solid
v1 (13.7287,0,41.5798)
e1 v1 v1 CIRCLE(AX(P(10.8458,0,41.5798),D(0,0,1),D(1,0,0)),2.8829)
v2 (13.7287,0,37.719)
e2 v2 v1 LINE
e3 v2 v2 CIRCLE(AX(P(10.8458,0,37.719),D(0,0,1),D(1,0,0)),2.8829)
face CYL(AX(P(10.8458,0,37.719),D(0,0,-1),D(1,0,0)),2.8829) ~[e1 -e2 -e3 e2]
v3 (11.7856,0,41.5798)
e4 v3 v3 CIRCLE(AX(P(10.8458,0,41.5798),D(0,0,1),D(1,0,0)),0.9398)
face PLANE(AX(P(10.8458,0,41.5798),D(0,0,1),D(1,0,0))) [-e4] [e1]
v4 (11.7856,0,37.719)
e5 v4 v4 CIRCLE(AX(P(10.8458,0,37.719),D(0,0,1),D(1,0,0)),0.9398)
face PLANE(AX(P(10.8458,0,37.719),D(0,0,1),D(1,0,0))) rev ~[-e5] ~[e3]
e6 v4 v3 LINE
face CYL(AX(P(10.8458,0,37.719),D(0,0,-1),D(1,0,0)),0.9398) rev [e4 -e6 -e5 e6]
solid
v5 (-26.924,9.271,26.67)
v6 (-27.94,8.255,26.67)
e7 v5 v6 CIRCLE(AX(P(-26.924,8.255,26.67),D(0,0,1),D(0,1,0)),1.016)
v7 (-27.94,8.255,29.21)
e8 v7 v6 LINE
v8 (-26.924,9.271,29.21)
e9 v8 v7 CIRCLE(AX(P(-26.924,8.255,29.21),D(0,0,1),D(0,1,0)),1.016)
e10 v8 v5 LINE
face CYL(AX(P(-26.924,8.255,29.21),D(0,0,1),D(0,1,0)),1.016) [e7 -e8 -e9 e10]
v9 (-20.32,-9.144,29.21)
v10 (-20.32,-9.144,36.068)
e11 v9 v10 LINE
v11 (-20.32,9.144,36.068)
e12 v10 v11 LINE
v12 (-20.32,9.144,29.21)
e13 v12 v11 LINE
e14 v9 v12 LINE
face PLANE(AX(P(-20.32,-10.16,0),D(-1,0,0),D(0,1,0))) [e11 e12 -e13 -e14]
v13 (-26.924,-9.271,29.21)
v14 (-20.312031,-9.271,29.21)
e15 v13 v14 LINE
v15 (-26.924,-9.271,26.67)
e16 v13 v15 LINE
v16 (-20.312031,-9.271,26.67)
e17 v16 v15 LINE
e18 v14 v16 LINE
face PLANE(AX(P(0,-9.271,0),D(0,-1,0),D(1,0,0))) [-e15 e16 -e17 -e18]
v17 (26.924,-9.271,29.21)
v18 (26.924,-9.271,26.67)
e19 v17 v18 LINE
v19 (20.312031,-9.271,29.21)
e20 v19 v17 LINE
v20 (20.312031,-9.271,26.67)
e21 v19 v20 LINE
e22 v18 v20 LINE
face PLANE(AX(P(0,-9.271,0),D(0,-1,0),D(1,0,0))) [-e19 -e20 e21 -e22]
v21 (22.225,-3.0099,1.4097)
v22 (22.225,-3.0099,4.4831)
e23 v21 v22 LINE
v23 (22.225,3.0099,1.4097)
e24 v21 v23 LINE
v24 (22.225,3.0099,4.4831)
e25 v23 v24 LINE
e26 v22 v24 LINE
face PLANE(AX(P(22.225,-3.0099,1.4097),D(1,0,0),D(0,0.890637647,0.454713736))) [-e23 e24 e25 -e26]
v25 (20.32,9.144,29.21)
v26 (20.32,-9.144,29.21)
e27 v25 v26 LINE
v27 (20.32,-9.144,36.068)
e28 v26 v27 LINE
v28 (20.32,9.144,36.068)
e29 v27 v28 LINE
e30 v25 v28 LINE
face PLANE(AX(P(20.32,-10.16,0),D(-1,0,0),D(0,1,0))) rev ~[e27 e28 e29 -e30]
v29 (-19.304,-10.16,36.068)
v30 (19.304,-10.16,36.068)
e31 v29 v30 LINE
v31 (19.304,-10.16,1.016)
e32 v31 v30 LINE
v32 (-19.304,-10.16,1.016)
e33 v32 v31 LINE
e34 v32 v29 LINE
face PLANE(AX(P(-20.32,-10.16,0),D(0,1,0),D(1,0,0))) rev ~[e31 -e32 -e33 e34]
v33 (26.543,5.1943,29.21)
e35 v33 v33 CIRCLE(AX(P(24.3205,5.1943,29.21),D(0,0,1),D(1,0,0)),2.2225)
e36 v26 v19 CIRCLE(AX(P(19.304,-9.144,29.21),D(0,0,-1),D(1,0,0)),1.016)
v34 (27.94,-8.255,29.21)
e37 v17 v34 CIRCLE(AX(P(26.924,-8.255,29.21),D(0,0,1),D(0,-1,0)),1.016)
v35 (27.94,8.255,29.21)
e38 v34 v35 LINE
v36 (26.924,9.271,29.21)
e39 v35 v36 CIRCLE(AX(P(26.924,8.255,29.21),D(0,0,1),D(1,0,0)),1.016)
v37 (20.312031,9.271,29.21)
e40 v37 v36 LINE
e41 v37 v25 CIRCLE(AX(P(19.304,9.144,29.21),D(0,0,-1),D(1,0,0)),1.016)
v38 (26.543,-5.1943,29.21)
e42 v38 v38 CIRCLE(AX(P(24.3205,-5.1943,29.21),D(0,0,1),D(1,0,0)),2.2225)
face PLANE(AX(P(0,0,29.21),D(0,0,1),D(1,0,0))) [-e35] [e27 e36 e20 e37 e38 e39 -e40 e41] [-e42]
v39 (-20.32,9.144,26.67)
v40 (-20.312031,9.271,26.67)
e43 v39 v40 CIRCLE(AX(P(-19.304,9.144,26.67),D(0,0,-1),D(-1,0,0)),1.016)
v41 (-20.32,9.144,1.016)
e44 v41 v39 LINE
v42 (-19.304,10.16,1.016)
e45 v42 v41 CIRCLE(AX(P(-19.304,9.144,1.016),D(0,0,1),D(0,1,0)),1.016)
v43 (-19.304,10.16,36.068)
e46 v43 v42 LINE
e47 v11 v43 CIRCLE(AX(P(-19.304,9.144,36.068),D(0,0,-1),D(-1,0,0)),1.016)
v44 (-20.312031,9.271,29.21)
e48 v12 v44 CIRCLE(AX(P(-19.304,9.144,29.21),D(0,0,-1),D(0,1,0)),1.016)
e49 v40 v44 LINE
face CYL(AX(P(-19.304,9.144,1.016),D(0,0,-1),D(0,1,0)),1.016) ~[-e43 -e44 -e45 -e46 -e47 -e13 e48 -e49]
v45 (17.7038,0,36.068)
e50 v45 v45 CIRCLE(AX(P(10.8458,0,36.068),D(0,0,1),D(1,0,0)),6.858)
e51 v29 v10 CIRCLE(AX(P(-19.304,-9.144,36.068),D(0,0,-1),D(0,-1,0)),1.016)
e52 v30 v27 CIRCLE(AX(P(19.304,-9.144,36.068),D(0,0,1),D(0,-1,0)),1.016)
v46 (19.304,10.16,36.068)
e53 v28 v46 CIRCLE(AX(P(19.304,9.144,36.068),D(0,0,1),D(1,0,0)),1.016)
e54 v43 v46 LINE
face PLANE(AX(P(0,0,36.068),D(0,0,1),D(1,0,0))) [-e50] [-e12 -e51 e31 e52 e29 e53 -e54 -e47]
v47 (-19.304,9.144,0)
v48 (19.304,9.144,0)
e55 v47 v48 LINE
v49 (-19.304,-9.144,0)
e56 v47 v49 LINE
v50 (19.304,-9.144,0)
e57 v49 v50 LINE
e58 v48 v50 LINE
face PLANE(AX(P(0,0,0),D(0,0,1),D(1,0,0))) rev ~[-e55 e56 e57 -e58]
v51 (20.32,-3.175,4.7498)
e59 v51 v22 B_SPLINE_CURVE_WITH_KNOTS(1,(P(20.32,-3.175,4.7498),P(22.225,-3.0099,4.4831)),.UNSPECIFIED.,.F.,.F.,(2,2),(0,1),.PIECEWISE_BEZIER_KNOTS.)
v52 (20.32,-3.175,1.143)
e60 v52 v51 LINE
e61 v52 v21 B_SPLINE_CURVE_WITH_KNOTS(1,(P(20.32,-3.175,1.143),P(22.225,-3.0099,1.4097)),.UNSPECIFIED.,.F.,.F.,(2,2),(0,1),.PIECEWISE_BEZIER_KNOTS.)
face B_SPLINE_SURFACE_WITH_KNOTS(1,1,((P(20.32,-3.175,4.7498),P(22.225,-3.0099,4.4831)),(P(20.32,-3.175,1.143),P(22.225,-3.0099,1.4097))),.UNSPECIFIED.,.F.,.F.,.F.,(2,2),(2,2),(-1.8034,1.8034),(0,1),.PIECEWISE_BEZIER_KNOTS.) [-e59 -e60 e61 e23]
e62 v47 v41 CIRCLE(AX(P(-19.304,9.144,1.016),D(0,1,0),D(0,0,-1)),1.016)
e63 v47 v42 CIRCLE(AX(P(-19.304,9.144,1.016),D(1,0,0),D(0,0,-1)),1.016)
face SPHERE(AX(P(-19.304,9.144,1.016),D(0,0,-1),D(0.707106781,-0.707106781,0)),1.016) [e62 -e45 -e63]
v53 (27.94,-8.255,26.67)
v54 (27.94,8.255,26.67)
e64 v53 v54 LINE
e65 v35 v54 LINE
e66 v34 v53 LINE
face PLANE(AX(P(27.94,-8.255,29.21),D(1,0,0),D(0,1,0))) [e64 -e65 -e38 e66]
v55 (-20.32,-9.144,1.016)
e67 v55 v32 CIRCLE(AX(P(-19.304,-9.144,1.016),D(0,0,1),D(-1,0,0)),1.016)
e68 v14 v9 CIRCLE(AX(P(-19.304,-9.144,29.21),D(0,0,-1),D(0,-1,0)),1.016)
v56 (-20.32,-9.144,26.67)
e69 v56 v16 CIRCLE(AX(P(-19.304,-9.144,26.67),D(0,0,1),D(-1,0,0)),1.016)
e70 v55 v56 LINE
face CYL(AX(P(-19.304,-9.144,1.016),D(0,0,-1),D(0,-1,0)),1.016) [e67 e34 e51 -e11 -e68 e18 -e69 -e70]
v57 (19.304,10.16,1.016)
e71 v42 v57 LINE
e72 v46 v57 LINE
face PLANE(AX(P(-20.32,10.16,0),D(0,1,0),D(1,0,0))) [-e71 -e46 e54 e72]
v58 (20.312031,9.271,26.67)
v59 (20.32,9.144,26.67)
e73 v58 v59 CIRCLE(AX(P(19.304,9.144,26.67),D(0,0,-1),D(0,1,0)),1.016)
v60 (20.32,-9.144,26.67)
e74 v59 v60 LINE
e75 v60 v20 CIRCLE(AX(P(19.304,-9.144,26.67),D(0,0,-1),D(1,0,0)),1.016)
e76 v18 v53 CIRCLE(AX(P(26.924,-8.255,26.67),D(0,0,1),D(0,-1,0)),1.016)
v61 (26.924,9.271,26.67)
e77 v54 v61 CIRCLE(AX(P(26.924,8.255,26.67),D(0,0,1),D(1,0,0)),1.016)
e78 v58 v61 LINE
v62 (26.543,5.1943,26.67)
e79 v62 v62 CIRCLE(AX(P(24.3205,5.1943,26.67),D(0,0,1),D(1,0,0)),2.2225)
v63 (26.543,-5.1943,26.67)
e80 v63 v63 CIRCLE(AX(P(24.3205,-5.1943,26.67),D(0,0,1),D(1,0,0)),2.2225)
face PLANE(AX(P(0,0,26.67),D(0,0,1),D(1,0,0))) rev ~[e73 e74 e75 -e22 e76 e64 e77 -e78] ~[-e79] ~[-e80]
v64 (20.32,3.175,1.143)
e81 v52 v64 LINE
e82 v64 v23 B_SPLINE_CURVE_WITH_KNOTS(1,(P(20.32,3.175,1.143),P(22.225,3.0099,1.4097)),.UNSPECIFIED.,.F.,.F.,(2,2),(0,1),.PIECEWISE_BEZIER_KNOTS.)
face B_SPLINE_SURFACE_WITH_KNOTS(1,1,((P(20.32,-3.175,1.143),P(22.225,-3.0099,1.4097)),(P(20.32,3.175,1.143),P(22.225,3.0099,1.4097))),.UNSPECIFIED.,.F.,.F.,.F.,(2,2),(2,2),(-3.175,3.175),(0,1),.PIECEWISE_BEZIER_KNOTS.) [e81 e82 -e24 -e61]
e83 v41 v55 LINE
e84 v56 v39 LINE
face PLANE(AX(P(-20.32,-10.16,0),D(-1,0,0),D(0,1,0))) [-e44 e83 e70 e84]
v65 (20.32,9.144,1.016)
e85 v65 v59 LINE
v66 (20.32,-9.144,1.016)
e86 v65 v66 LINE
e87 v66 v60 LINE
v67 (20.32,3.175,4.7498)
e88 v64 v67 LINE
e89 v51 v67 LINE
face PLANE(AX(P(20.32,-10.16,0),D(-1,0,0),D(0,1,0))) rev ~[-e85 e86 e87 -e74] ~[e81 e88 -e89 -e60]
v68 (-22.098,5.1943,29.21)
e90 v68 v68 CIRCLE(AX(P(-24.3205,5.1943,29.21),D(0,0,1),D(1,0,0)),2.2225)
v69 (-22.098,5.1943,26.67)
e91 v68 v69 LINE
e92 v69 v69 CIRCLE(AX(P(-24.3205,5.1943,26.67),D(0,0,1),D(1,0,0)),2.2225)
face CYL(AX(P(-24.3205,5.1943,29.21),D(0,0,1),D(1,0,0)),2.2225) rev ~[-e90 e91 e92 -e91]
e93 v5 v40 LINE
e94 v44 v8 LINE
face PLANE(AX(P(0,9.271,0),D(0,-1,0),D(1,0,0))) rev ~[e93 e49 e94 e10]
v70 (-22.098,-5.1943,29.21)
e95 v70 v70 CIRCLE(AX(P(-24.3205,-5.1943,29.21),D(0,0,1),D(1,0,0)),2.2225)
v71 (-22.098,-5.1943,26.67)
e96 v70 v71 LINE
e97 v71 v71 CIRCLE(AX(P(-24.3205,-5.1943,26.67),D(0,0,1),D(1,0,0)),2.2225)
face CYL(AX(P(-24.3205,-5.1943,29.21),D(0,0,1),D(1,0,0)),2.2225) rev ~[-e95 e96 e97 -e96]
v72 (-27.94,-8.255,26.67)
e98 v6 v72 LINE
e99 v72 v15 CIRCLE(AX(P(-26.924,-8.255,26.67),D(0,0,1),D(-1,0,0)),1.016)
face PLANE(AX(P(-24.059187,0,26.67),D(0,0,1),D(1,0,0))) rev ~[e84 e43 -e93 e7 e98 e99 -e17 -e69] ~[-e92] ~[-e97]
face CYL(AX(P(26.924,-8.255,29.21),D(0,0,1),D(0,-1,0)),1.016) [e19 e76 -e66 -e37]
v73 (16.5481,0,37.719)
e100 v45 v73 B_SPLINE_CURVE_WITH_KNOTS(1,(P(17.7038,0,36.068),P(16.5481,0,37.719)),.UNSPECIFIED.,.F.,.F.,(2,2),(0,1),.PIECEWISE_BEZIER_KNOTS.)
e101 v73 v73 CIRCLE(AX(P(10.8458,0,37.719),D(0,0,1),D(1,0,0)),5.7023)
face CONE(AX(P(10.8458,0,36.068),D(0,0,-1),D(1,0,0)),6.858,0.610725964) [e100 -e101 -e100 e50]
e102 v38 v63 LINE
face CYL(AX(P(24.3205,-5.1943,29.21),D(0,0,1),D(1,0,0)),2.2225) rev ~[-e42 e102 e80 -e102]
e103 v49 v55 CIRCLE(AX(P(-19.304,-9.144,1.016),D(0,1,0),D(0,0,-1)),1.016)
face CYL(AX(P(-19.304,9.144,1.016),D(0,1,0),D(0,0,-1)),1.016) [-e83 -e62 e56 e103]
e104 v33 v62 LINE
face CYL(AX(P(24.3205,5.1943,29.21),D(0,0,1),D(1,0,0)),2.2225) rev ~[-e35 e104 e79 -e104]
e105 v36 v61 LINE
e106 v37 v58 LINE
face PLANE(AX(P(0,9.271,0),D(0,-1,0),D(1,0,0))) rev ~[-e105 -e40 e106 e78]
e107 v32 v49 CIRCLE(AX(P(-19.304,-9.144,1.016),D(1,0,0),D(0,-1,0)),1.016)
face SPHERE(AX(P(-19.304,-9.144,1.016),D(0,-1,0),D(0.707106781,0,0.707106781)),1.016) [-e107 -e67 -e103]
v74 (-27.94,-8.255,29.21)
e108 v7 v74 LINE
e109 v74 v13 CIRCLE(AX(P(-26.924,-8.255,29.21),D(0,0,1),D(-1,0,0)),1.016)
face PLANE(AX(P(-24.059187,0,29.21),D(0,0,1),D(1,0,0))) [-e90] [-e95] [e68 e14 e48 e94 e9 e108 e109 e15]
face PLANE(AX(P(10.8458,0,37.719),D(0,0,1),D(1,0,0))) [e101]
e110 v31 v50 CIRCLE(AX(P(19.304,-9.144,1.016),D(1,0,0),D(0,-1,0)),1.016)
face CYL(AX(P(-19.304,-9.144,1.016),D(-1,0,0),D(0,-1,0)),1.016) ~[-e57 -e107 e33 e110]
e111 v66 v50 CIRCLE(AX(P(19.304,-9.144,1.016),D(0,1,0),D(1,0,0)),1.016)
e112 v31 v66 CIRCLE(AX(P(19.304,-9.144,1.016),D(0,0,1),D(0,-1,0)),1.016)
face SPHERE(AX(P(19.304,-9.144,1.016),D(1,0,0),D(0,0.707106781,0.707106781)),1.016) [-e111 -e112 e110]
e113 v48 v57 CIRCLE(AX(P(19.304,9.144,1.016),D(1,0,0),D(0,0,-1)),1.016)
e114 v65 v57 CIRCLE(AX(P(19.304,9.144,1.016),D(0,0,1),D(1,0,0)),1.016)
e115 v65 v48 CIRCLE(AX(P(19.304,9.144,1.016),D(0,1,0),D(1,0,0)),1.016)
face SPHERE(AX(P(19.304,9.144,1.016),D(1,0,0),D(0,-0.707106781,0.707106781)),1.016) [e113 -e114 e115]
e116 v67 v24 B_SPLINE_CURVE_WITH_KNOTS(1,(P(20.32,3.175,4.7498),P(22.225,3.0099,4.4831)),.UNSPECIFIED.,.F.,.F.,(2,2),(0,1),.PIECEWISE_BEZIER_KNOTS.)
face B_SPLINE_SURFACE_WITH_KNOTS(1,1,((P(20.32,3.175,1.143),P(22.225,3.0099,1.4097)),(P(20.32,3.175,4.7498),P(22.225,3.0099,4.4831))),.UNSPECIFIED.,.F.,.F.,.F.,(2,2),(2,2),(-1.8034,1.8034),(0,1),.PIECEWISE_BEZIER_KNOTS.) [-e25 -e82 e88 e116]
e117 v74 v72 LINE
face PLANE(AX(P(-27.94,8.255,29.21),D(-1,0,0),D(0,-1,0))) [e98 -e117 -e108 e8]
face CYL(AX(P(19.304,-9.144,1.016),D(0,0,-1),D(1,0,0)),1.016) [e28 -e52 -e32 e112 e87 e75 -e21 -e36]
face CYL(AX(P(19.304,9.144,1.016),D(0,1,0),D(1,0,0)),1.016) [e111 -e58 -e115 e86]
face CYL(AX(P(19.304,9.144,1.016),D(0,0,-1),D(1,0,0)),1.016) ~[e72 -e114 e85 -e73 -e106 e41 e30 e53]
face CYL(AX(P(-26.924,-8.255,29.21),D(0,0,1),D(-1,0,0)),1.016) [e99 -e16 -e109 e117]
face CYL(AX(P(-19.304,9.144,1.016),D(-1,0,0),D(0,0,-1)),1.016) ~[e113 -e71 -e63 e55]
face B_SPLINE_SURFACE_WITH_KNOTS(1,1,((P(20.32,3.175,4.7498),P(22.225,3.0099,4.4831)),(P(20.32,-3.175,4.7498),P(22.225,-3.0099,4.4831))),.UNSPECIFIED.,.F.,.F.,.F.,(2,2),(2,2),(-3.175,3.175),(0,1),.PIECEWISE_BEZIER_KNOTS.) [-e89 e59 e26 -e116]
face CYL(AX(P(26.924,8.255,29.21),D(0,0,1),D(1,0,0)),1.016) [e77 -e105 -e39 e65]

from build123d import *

# Parameters (mm, degrees)
F0_W           = 40.64
F0_H           = 20.32
F1_DEPTH       = 36.068
F2_W           = 6.35
F2_H           = 3.6068
F4_W           = 6.0198
F4_H           = 3.0734
F7_R           = 2.2225
F8_DEPTH       = 2.54
F9_R           = 6.858
F11_R          = 5.7023
F13_T1_DEPTH   = 38.608
F13_T3_DEPTH   = 18.288
F13_S7_W       = 1.016
F13_S7_H       = 1.016
F13_T8_DEPTH   = 1.016
F13_S13_W      = 1.016
F13_S13_H      = 1.016
F13_T14_DEPTH  = 1.016
F13_S19_W      = 1.016
F13_S19_H      = 1.016
F13_T20_DEPTH  = 1.016
F13_S25_W      = 1.016
F13_S25_H      = 1.016
F13_T26_DEPTH  = 1.016
F13_T32_DEPTH  = 37.592
F13_T38_DEPTH  = 37.592
F13_T44_DEPTH  = 37.592
F13_T51_DEPTH  = 37.592
F13_T57_DEPTH  = 37.592
F13_T63_DEPTH  = 37.592
F13_T69_DEPTH  = 37.592
F13_T75_DEPTH  = 37.592
F13_T82_DEPTH  = 37.592
F13_T88_DEPTH  = 37.592
F13_T94_DEPTH  = 37.592
F13_T100_DEPTH = 37.592
F13_T106_DEPTH = 37.592
F13_T113_DEPTH = 37.592
F13_T119_DEPTH = 37.592
F13_T125_DEPTH = 37.592
F13_T131_DEPTH = 37.592
F13_T137_DEPTH = 37.592
F13_T144_DEPTH = 37.592
F13_T150_DEPTH = 37.592
F14_R          = 2.8829
F14_R_2        = 0.9398
F15_DEPTH      = 3.8608


# Not quite as in the source:
# - a fillet or chamfer that OpenCascade refuses, or shapes differently, is made with other operations: its cross-section is extruded or revolved along the edge and cut away or added


with BuildPart() as f1:
    # F0 (on Top) → F1 (new body)
    with BuildSketch(Plane.XY):
        Rectangle(F0_W, F0_H)
    extrude(amount=F1_DEPTH)

    # F2 (on face) → F5 section 0
    with BuildSketch(Plane.YZ.offset(20.32)):
        with Locations((0, 2.9464)):
            Rectangle(F2_W, F2_H)
    # F4 (on offset) → F5 section 1
    with BuildSketch(Plane.YZ.offset(22.225)):
        with Locations((0, 2.9464)):
            Rectangle(F4_W, F4_H)
    loft()

    # F7 (on offset) → F8 (join)
    with BuildSketch(Plane.XY.offset(29.21)):
        with BuildLine():
            ThreePointArc((-27.94, -8.255), (-27.6424204897, -8.9734204897), (-26.924, -9.271))
            Line((-26.924, -9.271), (-20.32, -9.271))
            Line((-20.32, -9.271), (-20.32, 9.271))
            Line((-20.32, 9.271), (-26.924, 9.271))
            ThreePointArc((-26.924, 9.271), (-27.6424204897, 8.9734204897), (-27.94, 8.255))
            Line((-27.94, 8.255), (-27.94, -8.255))
        make_face()
        with Locations((-24.3205, -5.1943)):
            Circle(F7_R, mode=Mode.SUBTRACT)
        with Locations((-24.3205, 5.1943)):
            Circle(F7_R, mode=Mode.SUBTRACT)
        with BuildLine():
            ThreePointArc((27.94, 8.255), (27.6424204897, 8.9734204897), (26.924, 9.271))
            Line((26.924, 9.271), (20.32, 9.271))
            Line((20.32, 9.271), (20.32, -9.271))
            Line((20.32, -9.271), (26.924, -9.271))
            ThreePointArc((26.924, -9.271), (27.6424204897, -8.9734204897), (27.94, -8.255))
            Line((27.94, -8.255), (27.94, 8.255))
        make_face()
        with Locations((24.3205, -5.1943)):
            Circle(F7_R, mode=Mode.SUBTRACT)
        with Locations((24.3205, 5.1943)):
            Circle(F7_R, mode=Mode.SUBTRACT)
    extrude(amount=-F8_DEPTH)

    # F9 (on face) → F12 section 0
    with BuildSketch(Plane.XY.offset(36.068)):
        with Locations((10.8458, 0)):
            Circle(F9_R)
    # F11 (on offset) → F12 section 1
    with BuildSketch(Plane.XY.offset(37.719)):
        with Locations((10.8458, 0)):
            Circle(F11_R)
    loft()

    # F13: fillet of radius 1.016 on 8 edges, made by hand

    # F13_s2 → F13_t1 (cut)
    with BuildSketch(Plane.YZ.offset(-19.304)):
        with BuildLine():
            ThreePointArc((-10.16, 1.016), (-9.8624204897, 0.2975795103), (-9.144, 0))
            Line((-9.144, 0), (-10.16, 0))
            Line((-10.16, 0), (-10.16, 1.016))
        make_face()
        with BuildLine():
            ThreePointArc((9.144, 0), (9.8624204897, 0.2975795103), (10.16, 1.016))
            Line((10.16, 1.016), (10.16, 0))
            Line((10.16, 0), (9.144, 0))
        make_face()
    extrude(amount=F13_T1_DEPTH, mode=Mode.SUBTRACT)

    # F13_s4 → F13_t3 (cut)
    with BuildSketch(Plane.XZ.offset(-9.144)):
        with BuildLine():
            ThreePointArc((20.32, 1.016), (20.0224204897, 0.2975795103), (19.304, 0))
            Line((19.304, 0), (20.32, 0))
            Line((20.32, 0), (20.32, 1.016))
        make_face()
        with BuildLine():
            ThreePointArc((-19.304, 0), (-20.0224204897, 0.2975795103), (-20.32, 1.016))
            Line((-20.32, 1.016), (-20.32, 0))
            Line((-20.32, 0), (-19.304, 0))
        make_face()
    extrude(amount=F13_T3_DEPTH, mode=Mode.SUBTRACT)


with BuildPart() as f13_tool6:
    # F13_s7 → F13_t8 (new body)
    with BuildSketch(Plane.YZ.offset(19.304)):
        with Locations((-9.652, 0.508)):
            Rectangle(F13_S7_W, F13_S7_H)
    extrude(amount=F13_T8_DEPTH)

    # F13_s9 → F13_t10 (revolve, cut)
    with BuildSketch(Plane(origin=(19.304, -9.144, 1.016), x_dir=(0, 0.7071067812, 0.7071067812), z_dir=(0, 0.7071067812, -0.7071067812))):
        with BuildLine():
            ThreePointArc((0, -1.016), (1.016, 0), (0, 1.016))
            Line((0, 1.016), (0, -1.016))
        make_face()
    revolve(axis=Axis((19.304, -9.144, 1.016), (1, 0, 0)), mode=Mode.SUBTRACT)


with BuildPart() as f1_1:
    add(f1.part)

    # F13_t5: cut F13_tool6
    add(f13_tool6.part, mode=Mode.SUBTRACT)


with BuildPart() as f13_tool12:
    # F13_s13 → F13_t14 (new body)
    with BuildSketch(Plane.YZ.offset(19.304)):
        with Locations((9.652, 0.508)):
            Rectangle(F13_S13_W, F13_S13_H)
    extrude(amount=F13_T14_DEPTH)

    # F13_s15 → F13_t16 (revolve, cut)
    with BuildSketch(Plane(origin=(19.304, 9.144, 1.016), x_dir=(0, -0.7071067812, 0.7071067812), z_dir=(0, 0.7071067812, 0.7071067812))):
        with BuildLine():
            ThreePointArc((0, -1.016), (1.016, 0), (0, 1.016))
            Line((0, 1.016), (0, -1.016))
        make_face()
    revolve(axis=Axis((19.304, 9.144, 1.016), (1, 0, 0)), mode=Mode.SUBTRACT)


with BuildPart() as f1_2:
    add(f1_1.part)

    # F13_t11: cut F13_tool12
    add(f13_tool12.part, mode=Mode.SUBTRACT)


with BuildPart() as f13_tool18:
    # F13_s19 → F13_t20 (new body)
    with BuildSketch(Plane.XY.offset(1.016)):
        with Locations((-19.812, 9.652)):
            Rectangle(F13_S19_W, F13_S19_H)
    extrude(amount=-F13_T20_DEPTH)

    # F13_s21 → F13_t22 (revolve, cut)
    with BuildSketch(Plane(origin=(-19.304, 9.144, 1.016), x_dir=(0.7071067812, -0.7071067812, 0), z_dir=(0.7071067812, 0.7071067812, 0))):
        with BuildLine():
            ThreePointArc((0, -1.016), (1.016, 0), (0, 1.016))
            Line((0, 1.016), (0, -1.016))
        make_face()
    revolve(axis=Axis((-19.304, 9.144, 1.016), (0, 0, -1)), mode=Mode.SUBTRACT)


with BuildPart() as f1_3:
    add(f1_2.part)

    # F13_t17: cut F13_tool18
    add(f13_tool18.part, mode=Mode.SUBTRACT)


with BuildPart() as f13_tool24:
    # F13_s25 → F13_t26 (new body)
    with BuildSketch(Plane.XZ.offset(9.144)):
        with Locations((-19.812, 0.508)):
            Rectangle(F13_S25_W, F13_S25_H)
    extrude(amount=F13_T26_DEPTH)

    # F13_s27 → F13_t28 (revolve, cut)
    with BuildSketch(Plane(origin=(-19.304, -9.144, 1.016), x_dir=(0.7071067812, 0, 0.7071067812), z_dir=(0.7071067812, 0, -0.7071067812))):
        with BuildLine():
            ThreePointArc((0, -1.016), (1.016, 0), (0, 1.016))
            Line((0, 1.016), (0, -1.016))
        make_face()
    revolve(axis=Axis((-19.304, -9.144, 1.016), (0, -1, 0)), mode=Mode.SUBTRACT)


with BuildPart() as f1_4:
    add(f1_3.part)

    # F13_t23: cut F13_tool24
    add(f13_tool24.part, mode=Mode.SUBTRACT)


with BuildPart() as f13_tool30:
    # F13_s31 → F13_t32 (new body)
    with BuildSketch(Plane.XY.offset(1.016)):
        with BuildLine():
            ThreePointArc((20.32, -9.144), (20.0224204897, -9.8624204897), (19.304, -10.16))
            Line((19.304, -10.16), (20.32, -10.16))
            Line((20.32, -10.16), (20.32, -9.144))
        make_face()
    extrude(amount=F13_T32_DEPTH)

    split(bisect_by=Plane.XY.offset(26.67), keep=Keep.BOTTOM)

    split(bisect_by=Plane.XZ.offset(9.271), keep=Keep.BOTTOM)


with BuildPart() as f1_5:
    add(f1_4.part)

    # F13_t29: cut F13_tool30
    add(f13_tool30.part, mode=Mode.SUBTRACT)


with BuildPart() as f13_tool36:
    # F13_s37 → F13_t38 (new body)
    with BuildSketch(Plane.XY.offset(1.016)):
        with BuildLine():
            ThreePointArc((20.32, -9.144), (20.0224204897, -9.8624204897), (19.304, -10.16))
            Line((19.304, -10.16), (20.32, -10.16))
            Line((20.32, -10.16), (20.32, -9.144))
        make_face()
    extrude(amount=F13_T38_DEPTH)

    split(bisect_by=Plane.XY.offset(26.67), keep=Keep.BOTTOM)

    split(bisect_by=Plane.XZ.offset(9.271), keep=Keep.TOP)


with BuildPart() as f1_6:
    add(f1_5.part)

    # F13_t35: cut F13_tool36
    add(f13_tool36.part, mode=Mode.SUBTRACT)


with BuildPart() as f13_tool42:
    # F13_s43 → F13_t44 (new body)
    with BuildSketch(Plane.XY.offset(1.016)):
        with BuildLine():
            ThreePointArc((20.32, -9.144), (20.0224204897, -9.8624204897), (19.304, -10.16))
            Line((19.304, -10.16), (20.32, -10.16))
            Line((20.32, -10.16), (20.32, -9.144))
        make_face()
    extrude(amount=F13_T44_DEPTH)

    split(bisect_by=Plane.XY.offset(26.67), keep=Keep.TOP)

    split(bisect_by=Plane.XZ.offset(9.271), keep=Keep.TOP)

    split(bisect_by=Plane.XY.offset(29.21), keep=Keep.BOTTOM)


with BuildPart() as f1_7:
    add(f1_6.part)

    # F13_t41: cut F13_tool42
    add(f13_tool42.part, mode=Mode.SUBTRACT)


with BuildPart() as f13_tool49:
    # F13_s50 → F13_t51 (new body)
    with BuildSketch(Plane.XY.offset(1.016)):
        with BuildLine():
            ThreePointArc((20.32, -9.144), (20.0224204897, -9.8624204897), (19.304, -10.16))
            Line((19.304, -10.16), (20.32, -10.16))
            Line((20.32, -10.16), (20.32, -9.144))
        make_face()
    extrude(amount=F13_T51_DEPTH)

    split(bisect_by=Plane.XZ.offset(9.271), keep=Keep.BOTTOM)

    split(bisect_by=Plane.XY.offset(29.21), keep=Keep.TOP)


with BuildPart() as f1_8:
    add(f1_7.part)

    # F13_t48: cut F13_tool49
    add(f13_tool49.part, mode=Mode.SUBTRACT)


with BuildPart() as f13_tool55:
    # F13_s56 → F13_t57 (new body)
    with BuildSketch(Plane.XY.offset(1.016)):
        with BuildLine():
            ThreePointArc((20.32, -9.144), (20.0224204897, -9.8624204897), (19.304, -10.16))
            Line((19.304, -10.16), (20.32, -10.16))
            Line((20.32, -10.16), (20.32, -9.144))
        make_face()
    extrude(amount=F13_T57_DEPTH)

    split(bisect_by=Plane.XZ.offset(9.271), keep=Keep.TOP)

    split(bisect_by=Plane.XY.offset(29.21), keep=Keep.TOP)


with BuildPart() as f1_9:
    add(f1_8.part)

    # F13_t54: cut F13_tool55
    add(f13_tool55.part, mode=Mode.SUBTRACT)


with BuildPart() as f13_tool61:
    # F13_s62 → F13_t63 (new body)
    with BuildSketch(Plane.XY.offset(1.016)):
        with BuildLine():
            ThreePointArc((20.32, 9.144), (20.0224204897, 9.8624204897), (19.304, 10.16))
            Line((19.304, 10.16), (20.32, 10.16))
            Line((20.32, 10.16), (20.32, 9.144))
        make_face()
    extrude(amount=F13_T63_DEPTH)

    split(bisect_by=Plane.XZ.offset(-9.271), keep=Keep.TOP)

    split(bisect_by=Plane.XY.offset(26.67), keep=Keep.BOTTOM)


with BuildPart() as f1_10:
    add(f1_9.part)

    # F13_t60: cut F13_tool61
    add(f13_tool61.part, mode=Mode.SUBTRACT)


with BuildPart() as f13_tool67:
    # F13_s68 → F13_t69 (new body)
    with BuildSketch(Plane.XY.offset(1.016)):
        with BuildLine():
            ThreePointArc((20.32, 9.144), (20.0224204897, 9.8624204897), (19.304, 10.16))
            Line((19.304, 10.16), (20.32, 10.16))
            Line((20.32, 10.16), (20.32, 9.144))
        make_face()
    extrude(amount=F13_T69_DEPTH)

    split(bisect_by=Plane.XZ.offset(-9.271), keep=Keep.BOTTOM)

    split(bisect_by=Plane.XY.offset(26.67), keep=Keep.BOTTOM)


with BuildPart() as f1_11:
    add(f1_10.part)

    # F13_t66: cut F13_tool67
    add(f13_tool67.part, mode=Mode.SUBTRACT)


with BuildPart() as f13_tool73:
    # F13_s74 → F13_t75 (new body)
    with BuildSketch(Plane.XY.offset(1.016)):
        with BuildLine():
            ThreePointArc((20.32, 9.144), (20.0224204897, 9.8624204897), (19.304, 10.16))
            Line((19.304, 10.16), (20.32, 10.16))
            Line((20.32, 10.16), (20.32, 9.144))
        make_face()
    extrude(amount=F13_T75_DEPTH)

    split(bisect_by=Plane.XZ.offset(-9.271), keep=Keep.BOTTOM)

    split(bisect_by=Plane.XY.offset(26.67), keep=Keep.TOP)

    split(bisect_by=Plane.XY.offset(29.21), keep=Keep.BOTTOM)


with BuildPart() as f1_12:
    add(f1_11.part)

    # F13_t72: cut F13_tool73
    add(f13_tool73.part, mode=Mode.SUBTRACT)


with BuildPart() as f13_tool80:
    # F13_s81 → F13_t82 (new body)
    with BuildSketch(Plane.XY.offset(1.016)):
        with BuildLine():
            ThreePointArc((20.32, 9.144), (20.0224204897, 9.8624204897), (19.304, 10.16))
            Line((19.304, 10.16), (20.32, 10.16))
            Line((20.32, 10.16), (20.32, 9.144))
        make_face()
    extrude(amount=F13_T82_DEPTH)

    split(bisect_by=Plane.XZ.offset(-9.271), keep=Keep.TOP)

    split(bisect_by=Plane.XY.offset(29.21), keep=Keep.TOP)


with BuildPart() as f1_13:
    add(f1_12.part)

    # F13_t79: cut F13_tool80
    add(f13_tool80.part, mode=Mode.SUBTRACT)


with BuildPart() as f13_tool86:
    # F13_s87 → F13_t88 (new body)
    with BuildSketch(Plane.XY.offset(1.016)):
        with BuildLine():
            ThreePointArc((20.32, 9.144), (20.0224204897, 9.8624204897), (19.304, 10.16))
            Line((19.304, 10.16), (20.32, 10.16))
            Line((20.32, 10.16), (20.32, 9.144))
        make_face()
    extrude(amount=F13_T88_DEPTH)

    split(bisect_by=Plane.XZ.offset(-9.271), keep=Keep.BOTTOM)

    split(bisect_by=Plane.XY.offset(29.21), keep=Keep.TOP)


with BuildPart() as f1_14:
    add(f1_13.part)

    # F13_t85: cut F13_tool86
    add(f13_tool86.part, mode=Mode.SUBTRACT)


with BuildPart() as f13_tool92:
    # F13_s93 → F13_t94 (new body)
    with BuildSketch(Plane.XY.offset(1.016)):
        with BuildLine():
            ThreePointArc((-19.304, 10.16), (-20.0224204897, 9.8624204897), (-20.32, 9.144))
            Line((-20.32, 9.144), (-20.32, 10.16))
            Line((-20.32, 10.16), (-19.304, 10.16))
        make_face()
    extrude(amount=F13_T94_DEPTH)

    split(bisect_by=Plane.XY.offset(26.67), keep=Keep.BOTTOM)

    split(bisect_by=Plane.XZ.offset(-9.271), keep=Keep.BOTTOM)


with BuildPart() as f1_15:
    add(f1_14.part)

    # F13_t91: cut F13_tool92
    add(f13_tool92.part, mode=Mode.SUBTRACT)


with BuildPart() as f13_tool98:
    # F13_s99 → F13_t100 (new body)
    with BuildSketch(Plane.XY.offset(1.016)):
        with BuildLine():
            ThreePointArc((-19.304, 10.16), (-20.0224204897, 9.8624204897), (-20.32, 9.144))
            Line((-20.32, 9.144), (-20.32, 10.16))
            Line((-20.32, 10.16), (-19.304, 10.16))
        make_face()
    extrude(amount=F13_T100_DEPTH)

    split(bisect_by=Plane.XY.offset(26.67), keep=Keep.BOTTOM)

    split(bisect_by=Plane.XZ.offset(-9.271), keep=Keep.TOP)


with BuildPart() as f1_16:
    add(f1_15.part)

    # F13_t97: cut F13_tool98
    add(f13_tool98.part, mode=Mode.SUBTRACT)


with BuildPart() as f13_tool104:
    # F13_s105 → F13_t106 (new body)
    with BuildSketch(Plane.XY.offset(1.016)):
        with BuildLine():
            ThreePointArc((-19.304, 10.16), (-20.0224204897, 9.8624204897), (-20.32, 9.144))
            Line((-20.32, 9.144), (-20.32, 10.16))
            Line((-20.32, 10.16), (-19.304, 10.16))
        make_face()
    extrude(amount=F13_T106_DEPTH)

    split(bisect_by=Plane.XY.offset(26.67), keep=Keep.TOP)

    split(bisect_by=Plane.XZ.offset(-9.271), keep=Keep.BOTTOM)

    split(bisect_by=Plane.XY.offset(29.21), keep=Keep.BOTTOM)


with BuildPart() as f1_17:
    add(f1_16.part)

    # F13_t103: cut F13_tool104
    add(f13_tool104.part, mode=Mode.SUBTRACT)


with BuildPart() as f13_tool111:
    # F13_s112 → F13_t113 (new body)
    with BuildSketch(Plane.XY.offset(1.016)):
        with BuildLine():
            ThreePointArc((-19.304, 10.16), (-20.0224204897, 9.8624204897), (-20.32, 9.144))
            Line((-20.32, 9.144), (-20.32, 10.16))
            Line((-20.32, 10.16), (-19.304, 10.16))
        make_face()
    extrude(amount=F13_T113_DEPTH)

    split(bisect_by=Plane.XZ.offset(-9.271), keep=Keep.BOTTOM)

    split(bisect_by=Plane.XY.offset(29.21), keep=Keep.TOP)


with BuildPart() as f1_18:
    add(f1_17.part)

    # F13_t110: cut F13_tool111
    add(f13_tool111.part, mode=Mode.SUBTRACT)


with BuildPart() as f13_tool117:
    # F13_s118 → F13_t119 (new body)
    with BuildSketch(Plane.XY.offset(1.016)):
        with BuildLine():
            ThreePointArc((-19.304, 10.16), (-20.0224204897, 9.8624204897), (-20.32, 9.144))
            Line((-20.32, 9.144), (-20.32, 10.16))
            Line((-20.32, 10.16), (-19.304, 10.16))
        make_face()
    extrude(amount=F13_T119_DEPTH)

    split(bisect_by=Plane.XZ.offset(-9.271), keep=Keep.TOP)

    split(bisect_by=Plane.XY.offset(29.21), keep=Keep.TOP)


with BuildPart() as f1_19:
    add(f1_18.part)

    # F13_t116: cut F13_tool117
    add(f13_tool117.part, mode=Mode.SUBTRACT)


with BuildPart() as f13_tool123:
    # F13_s124 → F13_t125 (new body)
    with BuildSketch(Plane.XY.offset(1.016)):
        with BuildLine():
            ThreePointArc((-19.304, -10.16), (-20.0224204897, -9.8624204897), (-20.32, -9.144))
            Line((-20.32, -9.144), (-20.32, -10.16))
            Line((-20.32, -10.16), (-19.304, -10.16))
        make_face()
    extrude(amount=F13_T125_DEPTH)

    split(bisect_by=Plane.XZ.offset(9.271), keep=Keep.TOP)

    split(bisect_by=Plane.XY.offset(26.67), keep=Keep.BOTTOM)


with BuildPart() as f1_20:
    add(f1_19.part)

    # F13_t122: cut F13_tool123
    add(f13_tool123.part, mode=Mode.SUBTRACT)


with BuildPart() as f13_tool129:
    # F13_s130 → F13_t131 (new body)
    with BuildSketch(Plane.XY.offset(1.016)):
        with BuildLine():
            ThreePointArc((-19.304, -10.16), (-20.0224204897, -9.8624204897), (-20.32, -9.144))
            Line((-20.32, -9.144), (-20.32, -10.16))
            Line((-20.32, -10.16), (-19.304, -10.16))
        make_face()
    extrude(amount=F13_T131_DEPTH)

    split(bisect_by=Plane.XZ.offset(9.271), keep=Keep.BOTTOM)

    split(bisect_by=Plane.XY.offset(26.67), keep=Keep.BOTTOM)


with BuildPart() as f1_21:
    add(f1_20.part)

    # F13_t128: cut F13_tool129
    add(f13_tool129.part, mode=Mode.SUBTRACT)


with BuildPart() as f13_tool135:
    # F13_s136 → F13_t137 (new body)
    with BuildSketch(Plane.XY.offset(1.016)):
        with BuildLine():
            ThreePointArc((-19.304, -10.16), (-20.0224204897, -9.8624204897), (-20.32, -9.144))
            Line((-20.32, -9.144), (-20.32, -10.16))
            Line((-20.32, -10.16), (-19.304, -10.16))
        make_face()
    extrude(amount=F13_T137_DEPTH)

    split(bisect_by=Plane.XZ.offset(9.271), keep=Keep.TOP)

    split(bisect_by=Plane.XY.offset(26.67), keep=Keep.TOP)

    split(bisect_by=Plane.XY.offset(29.21), keep=Keep.BOTTOM)


with BuildPart() as f1_22:
    add(f1_21.part)

    # F13_t134: cut F13_tool135
    add(f13_tool135.part, mode=Mode.SUBTRACT)


with BuildPart() as f13_tool142:
    # F13_s143 → F13_t144 (new body)
    with BuildSketch(Plane.XY.offset(1.016)):
        with BuildLine():
            ThreePointArc((-19.304, -10.16), (-20.0224204897, -9.8624204897), (-20.32, -9.144))
            Line((-20.32, -9.144), (-20.32, -10.16))
            Line((-20.32, -10.16), (-19.304, -10.16))
        make_face()
    extrude(amount=F13_T144_DEPTH)

    split(bisect_by=Plane.XZ.offset(9.271), keep=Keep.TOP)

    split(bisect_by=Plane.XY.offset(29.21), keep=Keep.TOP)


with BuildPart() as f1_23:
    add(f1_22.part)

    # F13_t141: cut F13_tool142
    add(f13_tool142.part, mode=Mode.SUBTRACT)


with BuildPart() as f13_tool148:
    # F13_s149 → F13_t150 (new body)
    with BuildSketch(Plane.XY.offset(1.016)):
        with BuildLine():
            ThreePointArc((-19.304, -10.16), (-20.0224204897, -9.8624204897), (-20.32, -9.144))
            Line((-20.32, -9.144), (-20.32, -10.16))
            Line((-20.32, -10.16), (-19.304, -10.16))
        make_face()
    extrude(amount=F13_T150_DEPTH)

    split(bisect_by=Plane.XZ.offset(9.271), keep=Keep.BOTTOM)

    split(bisect_by=Plane.XY.offset(29.21), keep=Keep.TOP)


with BuildPart() as f1_24:
    add(f1_23.part)

    # F13_t147: cut F13_tool148
    add(f13_tool148.part, mode=Mode.SUBTRACT)


with BuildPart() as f15:
    # F14 (on face) → F15 (new body)
    with BuildSketch(Plane.XY.offset(37.719)):
        with Locations((10.8458, 0)):
            Circle(F14_R)
        with Locations((10.8458, 0)):
            Circle(F14_R_2, mode=Mode.SUBTRACT)
    extrude(amount=F15_DEPTH)


solid = Compound([f1_24.part, f15.part])
